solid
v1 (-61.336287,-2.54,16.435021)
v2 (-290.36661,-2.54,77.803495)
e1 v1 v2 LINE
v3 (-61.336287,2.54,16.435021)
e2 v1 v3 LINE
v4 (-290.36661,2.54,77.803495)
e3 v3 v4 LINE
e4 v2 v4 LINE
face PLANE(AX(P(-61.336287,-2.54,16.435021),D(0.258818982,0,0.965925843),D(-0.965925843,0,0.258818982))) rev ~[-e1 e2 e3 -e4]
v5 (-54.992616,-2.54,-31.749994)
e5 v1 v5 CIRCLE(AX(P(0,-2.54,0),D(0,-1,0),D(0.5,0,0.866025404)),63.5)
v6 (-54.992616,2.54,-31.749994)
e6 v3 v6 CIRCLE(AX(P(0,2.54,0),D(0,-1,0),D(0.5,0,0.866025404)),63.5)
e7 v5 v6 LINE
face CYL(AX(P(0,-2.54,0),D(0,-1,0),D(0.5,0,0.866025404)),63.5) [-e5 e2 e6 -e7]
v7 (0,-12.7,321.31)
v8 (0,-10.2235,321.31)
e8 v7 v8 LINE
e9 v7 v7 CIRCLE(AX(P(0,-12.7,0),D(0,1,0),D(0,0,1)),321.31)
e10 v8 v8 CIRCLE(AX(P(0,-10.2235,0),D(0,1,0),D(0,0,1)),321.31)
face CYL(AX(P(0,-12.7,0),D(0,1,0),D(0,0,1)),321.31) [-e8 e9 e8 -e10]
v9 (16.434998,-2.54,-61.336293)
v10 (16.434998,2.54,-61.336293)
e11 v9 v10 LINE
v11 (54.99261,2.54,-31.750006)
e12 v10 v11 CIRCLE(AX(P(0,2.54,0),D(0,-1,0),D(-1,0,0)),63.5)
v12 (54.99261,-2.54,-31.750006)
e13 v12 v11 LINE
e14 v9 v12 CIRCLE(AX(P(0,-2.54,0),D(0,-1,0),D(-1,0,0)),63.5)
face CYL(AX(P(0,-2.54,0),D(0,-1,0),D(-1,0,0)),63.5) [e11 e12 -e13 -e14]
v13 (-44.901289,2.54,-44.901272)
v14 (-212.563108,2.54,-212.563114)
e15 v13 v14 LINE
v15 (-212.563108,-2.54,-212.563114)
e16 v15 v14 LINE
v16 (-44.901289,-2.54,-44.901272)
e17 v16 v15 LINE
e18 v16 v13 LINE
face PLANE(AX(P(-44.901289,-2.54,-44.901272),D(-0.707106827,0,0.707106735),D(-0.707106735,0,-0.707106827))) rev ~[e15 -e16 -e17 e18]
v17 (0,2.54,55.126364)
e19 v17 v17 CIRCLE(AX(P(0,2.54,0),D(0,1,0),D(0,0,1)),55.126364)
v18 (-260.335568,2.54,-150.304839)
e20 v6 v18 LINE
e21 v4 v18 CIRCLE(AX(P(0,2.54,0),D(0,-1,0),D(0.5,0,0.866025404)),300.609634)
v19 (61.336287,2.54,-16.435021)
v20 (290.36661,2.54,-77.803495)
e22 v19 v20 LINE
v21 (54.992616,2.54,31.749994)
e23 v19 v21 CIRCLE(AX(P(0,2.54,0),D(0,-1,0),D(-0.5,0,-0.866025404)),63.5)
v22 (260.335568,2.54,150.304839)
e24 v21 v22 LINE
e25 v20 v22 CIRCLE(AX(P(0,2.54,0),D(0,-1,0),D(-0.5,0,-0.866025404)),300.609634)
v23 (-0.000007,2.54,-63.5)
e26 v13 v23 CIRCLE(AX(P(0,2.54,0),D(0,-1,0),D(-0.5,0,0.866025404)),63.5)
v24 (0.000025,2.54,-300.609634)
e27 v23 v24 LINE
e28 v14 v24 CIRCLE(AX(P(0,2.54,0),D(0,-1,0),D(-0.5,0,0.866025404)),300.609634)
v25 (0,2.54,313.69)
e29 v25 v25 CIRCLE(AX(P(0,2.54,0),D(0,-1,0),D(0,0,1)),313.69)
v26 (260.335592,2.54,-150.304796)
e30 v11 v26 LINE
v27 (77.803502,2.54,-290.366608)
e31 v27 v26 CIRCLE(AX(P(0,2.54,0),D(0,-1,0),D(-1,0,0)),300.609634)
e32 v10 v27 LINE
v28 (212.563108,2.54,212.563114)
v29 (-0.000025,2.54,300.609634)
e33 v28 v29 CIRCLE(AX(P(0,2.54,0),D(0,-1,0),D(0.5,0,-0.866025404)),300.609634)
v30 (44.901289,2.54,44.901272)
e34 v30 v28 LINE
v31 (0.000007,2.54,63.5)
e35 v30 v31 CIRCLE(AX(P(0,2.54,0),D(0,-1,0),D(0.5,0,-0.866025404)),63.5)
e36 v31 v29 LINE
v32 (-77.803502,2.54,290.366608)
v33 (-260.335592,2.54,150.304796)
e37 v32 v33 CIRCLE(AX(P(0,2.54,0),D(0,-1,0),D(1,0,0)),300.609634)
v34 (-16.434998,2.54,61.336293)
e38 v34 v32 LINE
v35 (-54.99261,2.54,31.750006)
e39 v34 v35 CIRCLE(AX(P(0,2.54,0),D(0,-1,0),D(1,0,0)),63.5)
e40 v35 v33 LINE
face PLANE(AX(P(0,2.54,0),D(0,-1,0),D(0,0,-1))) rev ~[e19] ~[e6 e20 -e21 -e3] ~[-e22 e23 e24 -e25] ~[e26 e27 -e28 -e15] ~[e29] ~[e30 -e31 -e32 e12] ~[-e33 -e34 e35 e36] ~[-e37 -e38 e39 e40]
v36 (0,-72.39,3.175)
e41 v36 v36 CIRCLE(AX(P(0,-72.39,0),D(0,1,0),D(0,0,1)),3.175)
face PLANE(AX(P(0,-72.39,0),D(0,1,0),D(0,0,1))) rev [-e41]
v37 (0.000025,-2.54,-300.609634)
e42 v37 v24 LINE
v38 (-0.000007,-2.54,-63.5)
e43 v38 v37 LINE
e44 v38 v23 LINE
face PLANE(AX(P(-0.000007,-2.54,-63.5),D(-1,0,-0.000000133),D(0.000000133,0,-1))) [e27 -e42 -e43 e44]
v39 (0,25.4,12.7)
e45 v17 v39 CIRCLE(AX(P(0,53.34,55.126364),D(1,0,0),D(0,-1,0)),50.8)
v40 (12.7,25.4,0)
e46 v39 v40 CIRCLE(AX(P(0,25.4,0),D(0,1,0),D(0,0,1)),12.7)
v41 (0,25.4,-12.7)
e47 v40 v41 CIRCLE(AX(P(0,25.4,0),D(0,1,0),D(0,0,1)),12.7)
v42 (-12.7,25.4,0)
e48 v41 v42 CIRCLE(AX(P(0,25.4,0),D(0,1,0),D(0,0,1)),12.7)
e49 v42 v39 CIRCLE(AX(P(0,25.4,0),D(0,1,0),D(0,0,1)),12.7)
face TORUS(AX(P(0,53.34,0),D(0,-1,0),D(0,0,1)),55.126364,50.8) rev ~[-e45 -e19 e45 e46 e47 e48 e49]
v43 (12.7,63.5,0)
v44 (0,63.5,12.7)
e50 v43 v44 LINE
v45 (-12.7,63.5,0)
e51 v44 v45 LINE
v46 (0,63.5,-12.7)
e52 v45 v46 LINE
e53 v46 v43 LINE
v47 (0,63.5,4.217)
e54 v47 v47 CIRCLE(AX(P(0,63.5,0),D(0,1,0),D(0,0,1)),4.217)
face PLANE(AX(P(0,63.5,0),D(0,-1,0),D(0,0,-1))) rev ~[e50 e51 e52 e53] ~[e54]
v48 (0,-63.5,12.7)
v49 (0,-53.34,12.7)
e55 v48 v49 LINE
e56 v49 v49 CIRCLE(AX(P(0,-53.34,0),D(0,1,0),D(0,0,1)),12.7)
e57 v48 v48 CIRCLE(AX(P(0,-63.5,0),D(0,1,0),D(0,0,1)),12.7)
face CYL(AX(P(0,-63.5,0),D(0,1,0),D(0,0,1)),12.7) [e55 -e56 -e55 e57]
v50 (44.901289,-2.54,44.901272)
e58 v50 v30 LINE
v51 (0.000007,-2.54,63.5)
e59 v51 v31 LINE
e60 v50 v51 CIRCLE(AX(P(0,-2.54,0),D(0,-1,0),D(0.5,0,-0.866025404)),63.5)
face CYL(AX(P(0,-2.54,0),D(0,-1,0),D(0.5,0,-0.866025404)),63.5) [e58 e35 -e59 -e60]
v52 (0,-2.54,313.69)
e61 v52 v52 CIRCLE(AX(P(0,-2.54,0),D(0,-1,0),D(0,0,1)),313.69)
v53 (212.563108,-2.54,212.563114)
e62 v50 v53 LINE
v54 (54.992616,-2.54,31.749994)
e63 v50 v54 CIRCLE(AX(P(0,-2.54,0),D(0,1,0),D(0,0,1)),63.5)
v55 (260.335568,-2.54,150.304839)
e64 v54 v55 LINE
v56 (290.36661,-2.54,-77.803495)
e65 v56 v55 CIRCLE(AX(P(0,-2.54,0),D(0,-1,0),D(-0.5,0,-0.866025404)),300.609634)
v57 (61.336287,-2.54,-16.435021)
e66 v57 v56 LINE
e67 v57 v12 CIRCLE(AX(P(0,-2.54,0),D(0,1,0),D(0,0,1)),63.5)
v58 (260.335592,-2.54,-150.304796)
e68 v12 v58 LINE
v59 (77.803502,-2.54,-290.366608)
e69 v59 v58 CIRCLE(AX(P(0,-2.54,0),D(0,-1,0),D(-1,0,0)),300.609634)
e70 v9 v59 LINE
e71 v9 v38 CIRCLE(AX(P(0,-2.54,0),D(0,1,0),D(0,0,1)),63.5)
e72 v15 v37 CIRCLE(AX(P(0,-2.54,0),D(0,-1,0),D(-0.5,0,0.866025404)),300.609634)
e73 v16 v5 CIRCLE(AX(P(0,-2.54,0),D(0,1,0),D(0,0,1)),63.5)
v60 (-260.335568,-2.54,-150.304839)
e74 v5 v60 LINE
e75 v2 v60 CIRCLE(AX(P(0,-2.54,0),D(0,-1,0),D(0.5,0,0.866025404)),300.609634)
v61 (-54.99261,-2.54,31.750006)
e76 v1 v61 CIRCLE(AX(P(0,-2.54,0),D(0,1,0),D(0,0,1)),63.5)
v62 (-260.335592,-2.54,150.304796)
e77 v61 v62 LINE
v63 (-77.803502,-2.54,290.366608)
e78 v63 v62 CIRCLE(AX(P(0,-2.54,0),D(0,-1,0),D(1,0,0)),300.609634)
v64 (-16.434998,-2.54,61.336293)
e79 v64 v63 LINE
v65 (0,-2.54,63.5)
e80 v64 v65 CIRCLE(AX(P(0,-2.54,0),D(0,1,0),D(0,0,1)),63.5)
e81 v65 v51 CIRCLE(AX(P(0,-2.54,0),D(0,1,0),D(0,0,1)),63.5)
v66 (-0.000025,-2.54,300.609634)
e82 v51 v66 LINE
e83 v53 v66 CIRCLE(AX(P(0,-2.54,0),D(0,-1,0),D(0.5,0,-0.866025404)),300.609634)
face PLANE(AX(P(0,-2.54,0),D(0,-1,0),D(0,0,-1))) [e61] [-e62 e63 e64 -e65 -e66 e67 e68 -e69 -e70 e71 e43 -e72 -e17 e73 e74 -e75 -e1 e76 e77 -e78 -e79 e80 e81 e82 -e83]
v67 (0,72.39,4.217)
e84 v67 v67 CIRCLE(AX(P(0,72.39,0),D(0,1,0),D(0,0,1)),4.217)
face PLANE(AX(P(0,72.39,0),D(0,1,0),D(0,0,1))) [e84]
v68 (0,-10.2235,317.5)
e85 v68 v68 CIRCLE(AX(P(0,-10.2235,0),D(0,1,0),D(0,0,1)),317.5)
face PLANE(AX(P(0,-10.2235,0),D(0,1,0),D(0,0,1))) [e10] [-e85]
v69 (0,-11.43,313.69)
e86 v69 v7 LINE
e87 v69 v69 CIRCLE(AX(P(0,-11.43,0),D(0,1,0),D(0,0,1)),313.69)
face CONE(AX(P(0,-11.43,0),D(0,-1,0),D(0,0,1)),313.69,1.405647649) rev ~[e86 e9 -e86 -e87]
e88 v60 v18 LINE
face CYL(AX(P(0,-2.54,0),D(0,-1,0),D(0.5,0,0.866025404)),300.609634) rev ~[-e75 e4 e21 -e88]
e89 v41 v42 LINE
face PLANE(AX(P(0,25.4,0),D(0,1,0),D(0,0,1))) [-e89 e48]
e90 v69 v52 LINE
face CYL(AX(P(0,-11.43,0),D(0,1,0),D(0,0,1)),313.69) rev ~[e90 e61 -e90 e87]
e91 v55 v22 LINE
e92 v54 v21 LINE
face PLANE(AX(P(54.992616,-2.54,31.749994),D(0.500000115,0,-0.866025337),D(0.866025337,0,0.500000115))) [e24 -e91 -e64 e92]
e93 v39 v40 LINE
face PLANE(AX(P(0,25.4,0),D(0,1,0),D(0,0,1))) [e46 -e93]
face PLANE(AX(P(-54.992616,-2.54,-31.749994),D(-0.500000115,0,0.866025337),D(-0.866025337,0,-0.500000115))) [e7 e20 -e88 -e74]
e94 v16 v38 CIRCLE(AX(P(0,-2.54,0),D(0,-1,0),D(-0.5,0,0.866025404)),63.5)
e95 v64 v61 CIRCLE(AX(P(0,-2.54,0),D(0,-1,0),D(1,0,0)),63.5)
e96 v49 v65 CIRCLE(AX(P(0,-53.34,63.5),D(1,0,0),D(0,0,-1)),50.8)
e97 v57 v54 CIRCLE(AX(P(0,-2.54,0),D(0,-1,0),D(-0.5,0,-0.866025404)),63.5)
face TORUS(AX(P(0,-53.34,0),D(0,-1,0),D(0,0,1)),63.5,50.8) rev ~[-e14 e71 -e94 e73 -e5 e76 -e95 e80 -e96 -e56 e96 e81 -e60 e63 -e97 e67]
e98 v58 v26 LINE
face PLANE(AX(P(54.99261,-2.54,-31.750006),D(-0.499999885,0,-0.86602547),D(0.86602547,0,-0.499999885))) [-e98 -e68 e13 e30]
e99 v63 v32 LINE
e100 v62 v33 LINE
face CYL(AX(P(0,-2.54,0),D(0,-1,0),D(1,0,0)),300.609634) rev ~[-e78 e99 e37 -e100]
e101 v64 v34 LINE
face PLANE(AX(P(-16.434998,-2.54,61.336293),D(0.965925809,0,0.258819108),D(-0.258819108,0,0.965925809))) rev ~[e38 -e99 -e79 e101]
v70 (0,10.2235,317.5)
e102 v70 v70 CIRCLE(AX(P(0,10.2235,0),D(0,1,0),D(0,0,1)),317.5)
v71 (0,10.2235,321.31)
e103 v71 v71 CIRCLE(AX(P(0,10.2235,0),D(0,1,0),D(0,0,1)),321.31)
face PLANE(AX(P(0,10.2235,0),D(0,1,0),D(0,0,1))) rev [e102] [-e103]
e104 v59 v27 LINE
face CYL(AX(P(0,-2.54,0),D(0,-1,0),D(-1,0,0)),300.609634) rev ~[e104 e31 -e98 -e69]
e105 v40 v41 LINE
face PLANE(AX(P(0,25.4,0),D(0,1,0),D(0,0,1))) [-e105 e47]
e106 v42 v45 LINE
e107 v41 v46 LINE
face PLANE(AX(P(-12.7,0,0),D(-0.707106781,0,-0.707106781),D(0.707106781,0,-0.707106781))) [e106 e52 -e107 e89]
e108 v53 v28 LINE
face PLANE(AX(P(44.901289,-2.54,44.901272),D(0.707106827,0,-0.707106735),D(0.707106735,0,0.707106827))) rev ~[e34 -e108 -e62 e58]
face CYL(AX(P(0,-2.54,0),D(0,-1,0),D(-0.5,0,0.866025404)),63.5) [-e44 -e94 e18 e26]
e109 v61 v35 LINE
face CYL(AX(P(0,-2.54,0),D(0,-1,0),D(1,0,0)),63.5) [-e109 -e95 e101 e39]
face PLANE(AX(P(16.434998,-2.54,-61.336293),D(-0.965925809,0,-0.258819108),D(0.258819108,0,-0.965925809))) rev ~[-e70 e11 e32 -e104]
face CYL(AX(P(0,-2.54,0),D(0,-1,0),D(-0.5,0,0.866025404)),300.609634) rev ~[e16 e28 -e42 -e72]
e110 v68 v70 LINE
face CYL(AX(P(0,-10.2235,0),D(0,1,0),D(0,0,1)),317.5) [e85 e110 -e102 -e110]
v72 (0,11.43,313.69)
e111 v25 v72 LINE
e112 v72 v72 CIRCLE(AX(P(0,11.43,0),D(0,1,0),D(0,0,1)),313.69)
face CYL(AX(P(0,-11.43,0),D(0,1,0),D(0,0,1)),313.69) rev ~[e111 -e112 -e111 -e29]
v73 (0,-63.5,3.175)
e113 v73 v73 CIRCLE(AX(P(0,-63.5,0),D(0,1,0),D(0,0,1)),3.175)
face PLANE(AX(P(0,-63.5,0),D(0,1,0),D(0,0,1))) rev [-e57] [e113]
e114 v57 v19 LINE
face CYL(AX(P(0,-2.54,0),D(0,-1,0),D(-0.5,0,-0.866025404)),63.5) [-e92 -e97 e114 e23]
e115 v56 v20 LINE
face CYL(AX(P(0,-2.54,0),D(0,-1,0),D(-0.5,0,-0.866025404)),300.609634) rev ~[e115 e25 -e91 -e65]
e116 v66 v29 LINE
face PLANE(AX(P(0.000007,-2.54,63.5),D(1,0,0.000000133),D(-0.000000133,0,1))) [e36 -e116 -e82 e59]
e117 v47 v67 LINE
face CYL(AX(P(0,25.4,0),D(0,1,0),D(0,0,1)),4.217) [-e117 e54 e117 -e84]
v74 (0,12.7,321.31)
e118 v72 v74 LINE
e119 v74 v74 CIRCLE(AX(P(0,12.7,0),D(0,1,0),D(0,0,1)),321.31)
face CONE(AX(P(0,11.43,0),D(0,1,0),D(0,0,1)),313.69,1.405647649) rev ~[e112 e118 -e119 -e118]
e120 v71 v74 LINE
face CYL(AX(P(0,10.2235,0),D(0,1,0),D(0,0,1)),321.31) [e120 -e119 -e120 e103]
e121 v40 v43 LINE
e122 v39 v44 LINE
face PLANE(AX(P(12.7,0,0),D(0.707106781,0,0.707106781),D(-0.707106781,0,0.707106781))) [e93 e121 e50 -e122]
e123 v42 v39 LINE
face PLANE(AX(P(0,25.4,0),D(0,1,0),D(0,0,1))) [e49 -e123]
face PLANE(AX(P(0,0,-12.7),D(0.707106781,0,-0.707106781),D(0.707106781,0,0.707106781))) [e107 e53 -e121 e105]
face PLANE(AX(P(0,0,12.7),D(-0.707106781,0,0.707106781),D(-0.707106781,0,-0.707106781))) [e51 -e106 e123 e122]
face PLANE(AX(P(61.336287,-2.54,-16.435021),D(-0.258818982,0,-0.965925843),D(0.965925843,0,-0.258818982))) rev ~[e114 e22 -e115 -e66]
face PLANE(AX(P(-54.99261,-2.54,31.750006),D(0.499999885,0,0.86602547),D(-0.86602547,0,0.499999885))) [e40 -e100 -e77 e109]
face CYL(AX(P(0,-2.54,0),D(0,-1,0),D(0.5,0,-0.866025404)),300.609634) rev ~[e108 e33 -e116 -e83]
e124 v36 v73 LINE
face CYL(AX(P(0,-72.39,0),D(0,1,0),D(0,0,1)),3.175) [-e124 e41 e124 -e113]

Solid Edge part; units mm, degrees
sketch "Sketch1" plane through (0, 0, 0) normal (1, 0, 0) x (0, 1, 0)
  line L0 (-72.39, 0) -> (-72.39, 3.175)
  line L1 (-72.39, 3.175) -> (-63.5, 3.175)
  line L2 (-63.5, 3.175) -> (-63.5, 12.7)
  line L3 (-63.5, 12.7) -> (25.4, 12.7)
  line L4 (25.4, 12.7) -> (25.4, 4.217)
  line L5 (25.4, 4.217) -> (72.39, 4.217)
  line L6 (72.39, 4.217) -> (72.39, 0)
  line L7 (-72.39, 0) -> (72.39, 0)
  dimension "D1" = 144.78
  dimension "D2" = 72.39
  dimension "D3" = 3.175
  dimension "D4" = 12.7
  dimension "D5" = 63.5
  dimension "D6" = 88.9
revolve "RevolvedProtrusion1" add sketch "Sketch1" angle 360 about axis through (0, -60.0075, 0) along (0, 1, 0)
sketch "Sketch2" plane through (0, 0, 0) normal (1, 0, 0) x (0, 1, 0)
  line L0 (-11.43, 313.69) -> (11.43, 313.69)
  line L1 (11.43, 313.69) -> (12.7, 321.31)
  line L2 (10.2235, 321.31) -> (12.7, 321.31)
  line L3 (10.2235, 317.5) -> (10.2235, 321.31)
  line L4 (-10.2235, 317.5) -> (10.2235, 317.5)
  line L5 (-10.2235, 321.31) -> (-10.2235, 317.5)
  line L6 (-12.7, 321.31) -> (-10.2235, 321.31)
  line L7 (-11.43, 313.69) -> (-12.7, 321.31)
  dimension "D1" = 313.69
  dimension "D2" = 3.81
  dimension "D3" = 7.62
  dimension "D4" = 20.447
  dimension "D5" = 25.4
  dimension "D6" = 22.86
revolve "RevolvedProtrusion2" add sketch "Sketch2" angle 360 about axis through (0, -60.0075, 0) along (0, 1, 0)
sketch "Sketch3" plane through (0, 0, 0) normal (0, -1, 0) x (1, 0, 0)
  circle A0 centre (0, 0) radius 313.69
extrude "Protrusion1" add sketch "Sketch3" along normal mid plane 5.08
fillet "Round_1" radius 50.8 2 edges at (0, -2.54, -12.7) (0, 2.54, -12.7)
sketch "Sketch4" plane through (0, -2.54, 0) normal (0, -1, 0) x (1, 0, 0)
  arc A0 (-77.8035, 290.3666) -> (-260.3356, 150.3048) centre (0, 0) ccw
  line L0 (-54.9926, 31.75) -> (-260.3356, 150.3048)
  arc A1 (-16.435, 61.3363) -> (-54.9926, 31.75) centre (0, 0) ccw
  line L1 (-16.435, 61.3363) -> (-77.8035, 290.3666)
extrude "Cutout1" cut sketch "Sketch4" against normal through all
pattern_circular "Pattern1" count 6 over 360 about axis through (0, -2.54, 0) along (0, -1, 0) of "Cutout1"
sketch "Sketch5" plane through (0, 0, 0) normal (0, -1, 0) x (1, 0, 0)
  line L0 (0, 12.7) -> (-12.7, 0)
  line L1 (-12.7, 0) -> (0, -12.7)
  line L2 (0, -12.7) -> (12.7, 0)
  line L3 (12.7, 0) -> (0, 12.7)
extrude "ExtrudedProtrusion_2" add sketch "Sketch5" against normal blind 63.5
properties part number "8-7" material "Carbon Fiber"
